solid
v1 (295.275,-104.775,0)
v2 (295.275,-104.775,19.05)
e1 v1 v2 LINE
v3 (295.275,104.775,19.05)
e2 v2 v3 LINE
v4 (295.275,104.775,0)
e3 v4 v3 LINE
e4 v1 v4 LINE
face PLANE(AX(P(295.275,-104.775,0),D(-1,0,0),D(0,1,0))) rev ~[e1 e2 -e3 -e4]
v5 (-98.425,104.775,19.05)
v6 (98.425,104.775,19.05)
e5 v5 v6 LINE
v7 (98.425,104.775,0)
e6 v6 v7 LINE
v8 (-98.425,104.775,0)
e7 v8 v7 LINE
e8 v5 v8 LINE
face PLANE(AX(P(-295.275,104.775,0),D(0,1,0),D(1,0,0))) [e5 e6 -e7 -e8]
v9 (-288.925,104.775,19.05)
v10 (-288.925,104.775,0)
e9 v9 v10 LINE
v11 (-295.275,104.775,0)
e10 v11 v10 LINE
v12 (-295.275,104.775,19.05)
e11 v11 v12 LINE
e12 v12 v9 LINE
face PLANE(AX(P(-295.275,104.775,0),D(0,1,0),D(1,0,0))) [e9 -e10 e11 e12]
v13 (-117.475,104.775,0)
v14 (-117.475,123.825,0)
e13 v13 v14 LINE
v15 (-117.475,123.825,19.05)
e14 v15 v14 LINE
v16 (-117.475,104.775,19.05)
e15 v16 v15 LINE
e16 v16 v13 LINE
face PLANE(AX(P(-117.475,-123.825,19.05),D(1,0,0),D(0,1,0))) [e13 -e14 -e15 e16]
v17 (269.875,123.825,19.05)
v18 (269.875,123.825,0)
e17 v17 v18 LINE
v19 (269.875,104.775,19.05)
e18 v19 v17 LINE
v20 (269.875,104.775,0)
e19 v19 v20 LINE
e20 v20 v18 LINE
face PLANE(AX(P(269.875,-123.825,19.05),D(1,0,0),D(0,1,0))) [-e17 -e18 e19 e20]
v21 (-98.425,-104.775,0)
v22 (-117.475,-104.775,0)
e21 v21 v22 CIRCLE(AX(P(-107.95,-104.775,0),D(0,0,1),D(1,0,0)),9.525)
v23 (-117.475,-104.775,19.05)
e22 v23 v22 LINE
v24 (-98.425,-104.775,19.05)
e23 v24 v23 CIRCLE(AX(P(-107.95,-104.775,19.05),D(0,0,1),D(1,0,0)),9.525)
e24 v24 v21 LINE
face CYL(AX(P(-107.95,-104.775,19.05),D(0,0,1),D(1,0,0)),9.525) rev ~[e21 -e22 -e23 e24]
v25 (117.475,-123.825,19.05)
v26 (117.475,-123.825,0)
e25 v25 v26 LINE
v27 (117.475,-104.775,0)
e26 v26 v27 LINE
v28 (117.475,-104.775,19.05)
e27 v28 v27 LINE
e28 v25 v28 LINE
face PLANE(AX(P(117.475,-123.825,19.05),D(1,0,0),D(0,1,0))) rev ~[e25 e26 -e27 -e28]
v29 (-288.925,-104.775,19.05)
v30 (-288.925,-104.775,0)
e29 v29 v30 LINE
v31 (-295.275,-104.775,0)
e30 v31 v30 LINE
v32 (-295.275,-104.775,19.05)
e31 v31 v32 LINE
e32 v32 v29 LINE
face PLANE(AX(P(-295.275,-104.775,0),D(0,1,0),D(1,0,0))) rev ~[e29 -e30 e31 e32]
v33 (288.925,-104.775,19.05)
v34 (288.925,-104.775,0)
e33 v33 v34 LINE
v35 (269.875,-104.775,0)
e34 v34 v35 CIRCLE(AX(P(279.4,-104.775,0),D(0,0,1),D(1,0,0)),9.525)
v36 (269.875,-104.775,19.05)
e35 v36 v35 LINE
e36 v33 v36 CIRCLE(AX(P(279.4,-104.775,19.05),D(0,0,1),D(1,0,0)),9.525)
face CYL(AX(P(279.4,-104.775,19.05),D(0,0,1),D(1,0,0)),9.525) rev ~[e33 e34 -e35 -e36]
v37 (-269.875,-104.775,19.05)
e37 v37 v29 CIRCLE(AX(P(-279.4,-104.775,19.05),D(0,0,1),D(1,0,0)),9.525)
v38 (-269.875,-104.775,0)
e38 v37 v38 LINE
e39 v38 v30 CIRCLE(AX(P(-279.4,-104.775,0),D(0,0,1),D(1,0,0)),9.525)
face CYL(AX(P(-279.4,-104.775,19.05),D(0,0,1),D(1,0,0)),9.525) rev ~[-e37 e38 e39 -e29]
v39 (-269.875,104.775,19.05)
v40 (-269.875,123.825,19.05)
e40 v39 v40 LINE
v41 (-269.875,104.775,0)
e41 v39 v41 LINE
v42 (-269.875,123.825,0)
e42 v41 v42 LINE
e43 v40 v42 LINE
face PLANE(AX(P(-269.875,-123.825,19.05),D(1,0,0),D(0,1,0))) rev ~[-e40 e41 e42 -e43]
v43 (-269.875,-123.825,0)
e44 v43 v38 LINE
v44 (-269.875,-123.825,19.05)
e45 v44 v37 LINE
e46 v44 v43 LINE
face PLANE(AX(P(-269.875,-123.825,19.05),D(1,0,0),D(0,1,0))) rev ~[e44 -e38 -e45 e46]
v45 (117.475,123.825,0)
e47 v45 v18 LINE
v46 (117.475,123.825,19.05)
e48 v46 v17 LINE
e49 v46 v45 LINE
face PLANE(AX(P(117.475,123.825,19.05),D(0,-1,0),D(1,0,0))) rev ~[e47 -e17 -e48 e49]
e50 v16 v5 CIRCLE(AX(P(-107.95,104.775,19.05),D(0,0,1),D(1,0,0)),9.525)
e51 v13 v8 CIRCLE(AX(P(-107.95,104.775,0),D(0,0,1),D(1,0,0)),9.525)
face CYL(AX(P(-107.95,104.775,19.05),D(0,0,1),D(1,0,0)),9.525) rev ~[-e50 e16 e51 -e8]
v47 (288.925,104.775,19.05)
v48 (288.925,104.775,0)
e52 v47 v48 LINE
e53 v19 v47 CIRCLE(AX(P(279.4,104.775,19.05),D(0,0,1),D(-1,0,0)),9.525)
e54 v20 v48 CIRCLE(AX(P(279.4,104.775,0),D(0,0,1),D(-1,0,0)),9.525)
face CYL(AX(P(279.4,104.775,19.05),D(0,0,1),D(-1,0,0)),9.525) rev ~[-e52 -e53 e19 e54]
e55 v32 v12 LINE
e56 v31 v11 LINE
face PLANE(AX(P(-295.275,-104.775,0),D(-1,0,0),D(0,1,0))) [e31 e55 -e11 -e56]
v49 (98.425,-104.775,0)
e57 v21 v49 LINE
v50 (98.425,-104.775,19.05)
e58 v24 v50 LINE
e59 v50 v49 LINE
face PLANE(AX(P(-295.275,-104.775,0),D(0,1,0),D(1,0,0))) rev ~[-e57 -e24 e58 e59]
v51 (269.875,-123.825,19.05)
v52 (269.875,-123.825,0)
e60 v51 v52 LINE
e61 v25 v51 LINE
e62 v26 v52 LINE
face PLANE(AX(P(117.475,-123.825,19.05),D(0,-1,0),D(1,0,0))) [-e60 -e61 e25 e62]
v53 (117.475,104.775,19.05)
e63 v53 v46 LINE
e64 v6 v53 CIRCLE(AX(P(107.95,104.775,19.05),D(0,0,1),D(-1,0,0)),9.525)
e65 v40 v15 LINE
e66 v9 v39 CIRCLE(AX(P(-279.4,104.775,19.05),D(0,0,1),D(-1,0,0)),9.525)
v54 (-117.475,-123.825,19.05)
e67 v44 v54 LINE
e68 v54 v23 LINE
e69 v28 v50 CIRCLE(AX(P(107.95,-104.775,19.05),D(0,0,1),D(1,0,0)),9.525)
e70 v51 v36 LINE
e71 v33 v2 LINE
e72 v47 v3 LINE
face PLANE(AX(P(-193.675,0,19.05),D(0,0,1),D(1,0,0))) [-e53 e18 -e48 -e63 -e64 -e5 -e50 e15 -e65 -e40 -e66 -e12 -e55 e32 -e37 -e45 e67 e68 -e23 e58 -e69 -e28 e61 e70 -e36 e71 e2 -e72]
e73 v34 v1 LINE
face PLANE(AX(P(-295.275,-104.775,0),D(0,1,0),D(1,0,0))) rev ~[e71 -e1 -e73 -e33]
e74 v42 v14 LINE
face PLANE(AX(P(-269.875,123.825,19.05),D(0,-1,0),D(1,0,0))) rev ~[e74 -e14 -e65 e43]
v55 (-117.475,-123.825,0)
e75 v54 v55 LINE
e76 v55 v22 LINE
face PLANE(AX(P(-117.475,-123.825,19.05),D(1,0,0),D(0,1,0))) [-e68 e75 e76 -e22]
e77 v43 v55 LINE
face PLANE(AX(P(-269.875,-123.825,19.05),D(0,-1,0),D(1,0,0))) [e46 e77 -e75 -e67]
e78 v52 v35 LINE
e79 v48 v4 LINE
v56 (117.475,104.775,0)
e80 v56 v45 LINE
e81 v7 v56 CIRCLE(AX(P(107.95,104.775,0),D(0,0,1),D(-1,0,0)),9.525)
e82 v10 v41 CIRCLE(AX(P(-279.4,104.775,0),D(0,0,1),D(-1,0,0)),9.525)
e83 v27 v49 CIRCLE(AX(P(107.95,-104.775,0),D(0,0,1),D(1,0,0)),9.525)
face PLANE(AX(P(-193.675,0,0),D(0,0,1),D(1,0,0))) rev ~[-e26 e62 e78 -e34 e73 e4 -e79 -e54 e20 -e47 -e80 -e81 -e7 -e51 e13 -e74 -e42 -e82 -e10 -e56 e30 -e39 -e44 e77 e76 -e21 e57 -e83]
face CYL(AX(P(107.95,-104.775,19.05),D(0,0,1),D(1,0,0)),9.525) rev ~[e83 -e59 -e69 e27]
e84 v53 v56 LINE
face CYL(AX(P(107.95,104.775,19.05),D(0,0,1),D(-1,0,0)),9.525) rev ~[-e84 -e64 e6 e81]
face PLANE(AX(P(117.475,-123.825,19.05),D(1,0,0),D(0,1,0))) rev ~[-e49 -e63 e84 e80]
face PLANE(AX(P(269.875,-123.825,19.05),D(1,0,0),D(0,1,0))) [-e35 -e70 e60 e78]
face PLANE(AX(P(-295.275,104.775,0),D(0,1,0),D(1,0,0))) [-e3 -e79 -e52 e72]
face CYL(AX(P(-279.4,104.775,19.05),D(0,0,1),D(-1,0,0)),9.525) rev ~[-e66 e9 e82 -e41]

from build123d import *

# Parameters (mm, degrees)
F1_W     = 590.55
F1_H     = 209.55
F2_DEPTH = 19.05
F3_W     = 152.4
F3_H     = 247.65
F4_DEPTH = 19.05
F6_DEPTH = 25.4


# Not quite as in the source:
# - a variable given as a bare number and used for a length is read in inches; the dataset says mm whatever the document's units were


with BuildPart() as f2:
    # F1 (on Top) → F2 (new body)
    with BuildSketch(Plane.XY):
        Rectangle(F1_W, F1_H)
    extrude(amount=F2_DEPTH)

    # F3 (on face) → F4 (join)
    with BuildSketch(Plane.XY.offset(19.05)):
        with Locations((-193.675, 0)):
            Rectangle(F3_W, F3_H)
        with Locations((193.675, 0)):
            Rectangle(F3_W, F3_H)
    extrude(amount=-F4_DEPTH)

    # F5 (on face) → F6 (cut)
    with BuildSketch(Plane.XY.offset(19.05)):
        with BuildLine():
            Line((-98.425, 104.775), (-117.475, 104.775))
            ThreePointArc((-117.475, 104.775), (-107.95, 95.25), (-98.425, 104.775))
        make_face()
        with BuildLine():
            ThreePointArc((-98.425, 104.775), (-107.95, 114.3), (-117.475, 104.775))
            Line((-117.475, 104.775), (-98.425, 104.775))
        make_face()
        with BuildLine():
            Line((-117.475, -104.775), (-98.425, -104.775))
            ThreePointArc((-98.425, -104.775), (-107.95, -95.25), (-117.475, -104.775))
        make_face()
        with BuildLine():
            Line((98.425, -104.775), (117.475, -104.775))
            ThreePointArc((117.475, -104.775), (107.95, -95.25), (98.425, -104.775))
        make_face()
        with BuildLine():
            Line((117.475, 104.775), (98.425, 104.775))
            ThreePointArc((98.425, 104.775), (107.95, 95.25), (117.475, 104.775))
        make_face()
        with BuildLine():
            Line((288.925, 104.775), (269.875, 104.775))
            ThreePointArc((269.875, 104.775), (279.4, 95.25), (288.925, 104.775))
        make_face()
        with BuildLine():
            Line((269.875, -104.775), (288.925, -104.775))
            ThreePointArc((288.925, -104.775), (279.4, -95.25), (269.875, -104.775))
        make_face()
        with BuildLine():
            Line((-288.925, -104.775), (-269.875, -104.775))
            ThreePointArc((-269.875, -104.775), (-279.4, -95.25), (-288.925, -104.775))
        make_face()
        with BuildLine():
            Line((-269.875, 104.775), (-288.925, 104.775))
            ThreePointArc((-288.925, 104.775), (-279.4, 95.25), (-269.875, 104.775))
        make_face()
    extrude(amount=-F6_DEPTH, mode=Mode.SUBTRACT)


solid = f2.part
